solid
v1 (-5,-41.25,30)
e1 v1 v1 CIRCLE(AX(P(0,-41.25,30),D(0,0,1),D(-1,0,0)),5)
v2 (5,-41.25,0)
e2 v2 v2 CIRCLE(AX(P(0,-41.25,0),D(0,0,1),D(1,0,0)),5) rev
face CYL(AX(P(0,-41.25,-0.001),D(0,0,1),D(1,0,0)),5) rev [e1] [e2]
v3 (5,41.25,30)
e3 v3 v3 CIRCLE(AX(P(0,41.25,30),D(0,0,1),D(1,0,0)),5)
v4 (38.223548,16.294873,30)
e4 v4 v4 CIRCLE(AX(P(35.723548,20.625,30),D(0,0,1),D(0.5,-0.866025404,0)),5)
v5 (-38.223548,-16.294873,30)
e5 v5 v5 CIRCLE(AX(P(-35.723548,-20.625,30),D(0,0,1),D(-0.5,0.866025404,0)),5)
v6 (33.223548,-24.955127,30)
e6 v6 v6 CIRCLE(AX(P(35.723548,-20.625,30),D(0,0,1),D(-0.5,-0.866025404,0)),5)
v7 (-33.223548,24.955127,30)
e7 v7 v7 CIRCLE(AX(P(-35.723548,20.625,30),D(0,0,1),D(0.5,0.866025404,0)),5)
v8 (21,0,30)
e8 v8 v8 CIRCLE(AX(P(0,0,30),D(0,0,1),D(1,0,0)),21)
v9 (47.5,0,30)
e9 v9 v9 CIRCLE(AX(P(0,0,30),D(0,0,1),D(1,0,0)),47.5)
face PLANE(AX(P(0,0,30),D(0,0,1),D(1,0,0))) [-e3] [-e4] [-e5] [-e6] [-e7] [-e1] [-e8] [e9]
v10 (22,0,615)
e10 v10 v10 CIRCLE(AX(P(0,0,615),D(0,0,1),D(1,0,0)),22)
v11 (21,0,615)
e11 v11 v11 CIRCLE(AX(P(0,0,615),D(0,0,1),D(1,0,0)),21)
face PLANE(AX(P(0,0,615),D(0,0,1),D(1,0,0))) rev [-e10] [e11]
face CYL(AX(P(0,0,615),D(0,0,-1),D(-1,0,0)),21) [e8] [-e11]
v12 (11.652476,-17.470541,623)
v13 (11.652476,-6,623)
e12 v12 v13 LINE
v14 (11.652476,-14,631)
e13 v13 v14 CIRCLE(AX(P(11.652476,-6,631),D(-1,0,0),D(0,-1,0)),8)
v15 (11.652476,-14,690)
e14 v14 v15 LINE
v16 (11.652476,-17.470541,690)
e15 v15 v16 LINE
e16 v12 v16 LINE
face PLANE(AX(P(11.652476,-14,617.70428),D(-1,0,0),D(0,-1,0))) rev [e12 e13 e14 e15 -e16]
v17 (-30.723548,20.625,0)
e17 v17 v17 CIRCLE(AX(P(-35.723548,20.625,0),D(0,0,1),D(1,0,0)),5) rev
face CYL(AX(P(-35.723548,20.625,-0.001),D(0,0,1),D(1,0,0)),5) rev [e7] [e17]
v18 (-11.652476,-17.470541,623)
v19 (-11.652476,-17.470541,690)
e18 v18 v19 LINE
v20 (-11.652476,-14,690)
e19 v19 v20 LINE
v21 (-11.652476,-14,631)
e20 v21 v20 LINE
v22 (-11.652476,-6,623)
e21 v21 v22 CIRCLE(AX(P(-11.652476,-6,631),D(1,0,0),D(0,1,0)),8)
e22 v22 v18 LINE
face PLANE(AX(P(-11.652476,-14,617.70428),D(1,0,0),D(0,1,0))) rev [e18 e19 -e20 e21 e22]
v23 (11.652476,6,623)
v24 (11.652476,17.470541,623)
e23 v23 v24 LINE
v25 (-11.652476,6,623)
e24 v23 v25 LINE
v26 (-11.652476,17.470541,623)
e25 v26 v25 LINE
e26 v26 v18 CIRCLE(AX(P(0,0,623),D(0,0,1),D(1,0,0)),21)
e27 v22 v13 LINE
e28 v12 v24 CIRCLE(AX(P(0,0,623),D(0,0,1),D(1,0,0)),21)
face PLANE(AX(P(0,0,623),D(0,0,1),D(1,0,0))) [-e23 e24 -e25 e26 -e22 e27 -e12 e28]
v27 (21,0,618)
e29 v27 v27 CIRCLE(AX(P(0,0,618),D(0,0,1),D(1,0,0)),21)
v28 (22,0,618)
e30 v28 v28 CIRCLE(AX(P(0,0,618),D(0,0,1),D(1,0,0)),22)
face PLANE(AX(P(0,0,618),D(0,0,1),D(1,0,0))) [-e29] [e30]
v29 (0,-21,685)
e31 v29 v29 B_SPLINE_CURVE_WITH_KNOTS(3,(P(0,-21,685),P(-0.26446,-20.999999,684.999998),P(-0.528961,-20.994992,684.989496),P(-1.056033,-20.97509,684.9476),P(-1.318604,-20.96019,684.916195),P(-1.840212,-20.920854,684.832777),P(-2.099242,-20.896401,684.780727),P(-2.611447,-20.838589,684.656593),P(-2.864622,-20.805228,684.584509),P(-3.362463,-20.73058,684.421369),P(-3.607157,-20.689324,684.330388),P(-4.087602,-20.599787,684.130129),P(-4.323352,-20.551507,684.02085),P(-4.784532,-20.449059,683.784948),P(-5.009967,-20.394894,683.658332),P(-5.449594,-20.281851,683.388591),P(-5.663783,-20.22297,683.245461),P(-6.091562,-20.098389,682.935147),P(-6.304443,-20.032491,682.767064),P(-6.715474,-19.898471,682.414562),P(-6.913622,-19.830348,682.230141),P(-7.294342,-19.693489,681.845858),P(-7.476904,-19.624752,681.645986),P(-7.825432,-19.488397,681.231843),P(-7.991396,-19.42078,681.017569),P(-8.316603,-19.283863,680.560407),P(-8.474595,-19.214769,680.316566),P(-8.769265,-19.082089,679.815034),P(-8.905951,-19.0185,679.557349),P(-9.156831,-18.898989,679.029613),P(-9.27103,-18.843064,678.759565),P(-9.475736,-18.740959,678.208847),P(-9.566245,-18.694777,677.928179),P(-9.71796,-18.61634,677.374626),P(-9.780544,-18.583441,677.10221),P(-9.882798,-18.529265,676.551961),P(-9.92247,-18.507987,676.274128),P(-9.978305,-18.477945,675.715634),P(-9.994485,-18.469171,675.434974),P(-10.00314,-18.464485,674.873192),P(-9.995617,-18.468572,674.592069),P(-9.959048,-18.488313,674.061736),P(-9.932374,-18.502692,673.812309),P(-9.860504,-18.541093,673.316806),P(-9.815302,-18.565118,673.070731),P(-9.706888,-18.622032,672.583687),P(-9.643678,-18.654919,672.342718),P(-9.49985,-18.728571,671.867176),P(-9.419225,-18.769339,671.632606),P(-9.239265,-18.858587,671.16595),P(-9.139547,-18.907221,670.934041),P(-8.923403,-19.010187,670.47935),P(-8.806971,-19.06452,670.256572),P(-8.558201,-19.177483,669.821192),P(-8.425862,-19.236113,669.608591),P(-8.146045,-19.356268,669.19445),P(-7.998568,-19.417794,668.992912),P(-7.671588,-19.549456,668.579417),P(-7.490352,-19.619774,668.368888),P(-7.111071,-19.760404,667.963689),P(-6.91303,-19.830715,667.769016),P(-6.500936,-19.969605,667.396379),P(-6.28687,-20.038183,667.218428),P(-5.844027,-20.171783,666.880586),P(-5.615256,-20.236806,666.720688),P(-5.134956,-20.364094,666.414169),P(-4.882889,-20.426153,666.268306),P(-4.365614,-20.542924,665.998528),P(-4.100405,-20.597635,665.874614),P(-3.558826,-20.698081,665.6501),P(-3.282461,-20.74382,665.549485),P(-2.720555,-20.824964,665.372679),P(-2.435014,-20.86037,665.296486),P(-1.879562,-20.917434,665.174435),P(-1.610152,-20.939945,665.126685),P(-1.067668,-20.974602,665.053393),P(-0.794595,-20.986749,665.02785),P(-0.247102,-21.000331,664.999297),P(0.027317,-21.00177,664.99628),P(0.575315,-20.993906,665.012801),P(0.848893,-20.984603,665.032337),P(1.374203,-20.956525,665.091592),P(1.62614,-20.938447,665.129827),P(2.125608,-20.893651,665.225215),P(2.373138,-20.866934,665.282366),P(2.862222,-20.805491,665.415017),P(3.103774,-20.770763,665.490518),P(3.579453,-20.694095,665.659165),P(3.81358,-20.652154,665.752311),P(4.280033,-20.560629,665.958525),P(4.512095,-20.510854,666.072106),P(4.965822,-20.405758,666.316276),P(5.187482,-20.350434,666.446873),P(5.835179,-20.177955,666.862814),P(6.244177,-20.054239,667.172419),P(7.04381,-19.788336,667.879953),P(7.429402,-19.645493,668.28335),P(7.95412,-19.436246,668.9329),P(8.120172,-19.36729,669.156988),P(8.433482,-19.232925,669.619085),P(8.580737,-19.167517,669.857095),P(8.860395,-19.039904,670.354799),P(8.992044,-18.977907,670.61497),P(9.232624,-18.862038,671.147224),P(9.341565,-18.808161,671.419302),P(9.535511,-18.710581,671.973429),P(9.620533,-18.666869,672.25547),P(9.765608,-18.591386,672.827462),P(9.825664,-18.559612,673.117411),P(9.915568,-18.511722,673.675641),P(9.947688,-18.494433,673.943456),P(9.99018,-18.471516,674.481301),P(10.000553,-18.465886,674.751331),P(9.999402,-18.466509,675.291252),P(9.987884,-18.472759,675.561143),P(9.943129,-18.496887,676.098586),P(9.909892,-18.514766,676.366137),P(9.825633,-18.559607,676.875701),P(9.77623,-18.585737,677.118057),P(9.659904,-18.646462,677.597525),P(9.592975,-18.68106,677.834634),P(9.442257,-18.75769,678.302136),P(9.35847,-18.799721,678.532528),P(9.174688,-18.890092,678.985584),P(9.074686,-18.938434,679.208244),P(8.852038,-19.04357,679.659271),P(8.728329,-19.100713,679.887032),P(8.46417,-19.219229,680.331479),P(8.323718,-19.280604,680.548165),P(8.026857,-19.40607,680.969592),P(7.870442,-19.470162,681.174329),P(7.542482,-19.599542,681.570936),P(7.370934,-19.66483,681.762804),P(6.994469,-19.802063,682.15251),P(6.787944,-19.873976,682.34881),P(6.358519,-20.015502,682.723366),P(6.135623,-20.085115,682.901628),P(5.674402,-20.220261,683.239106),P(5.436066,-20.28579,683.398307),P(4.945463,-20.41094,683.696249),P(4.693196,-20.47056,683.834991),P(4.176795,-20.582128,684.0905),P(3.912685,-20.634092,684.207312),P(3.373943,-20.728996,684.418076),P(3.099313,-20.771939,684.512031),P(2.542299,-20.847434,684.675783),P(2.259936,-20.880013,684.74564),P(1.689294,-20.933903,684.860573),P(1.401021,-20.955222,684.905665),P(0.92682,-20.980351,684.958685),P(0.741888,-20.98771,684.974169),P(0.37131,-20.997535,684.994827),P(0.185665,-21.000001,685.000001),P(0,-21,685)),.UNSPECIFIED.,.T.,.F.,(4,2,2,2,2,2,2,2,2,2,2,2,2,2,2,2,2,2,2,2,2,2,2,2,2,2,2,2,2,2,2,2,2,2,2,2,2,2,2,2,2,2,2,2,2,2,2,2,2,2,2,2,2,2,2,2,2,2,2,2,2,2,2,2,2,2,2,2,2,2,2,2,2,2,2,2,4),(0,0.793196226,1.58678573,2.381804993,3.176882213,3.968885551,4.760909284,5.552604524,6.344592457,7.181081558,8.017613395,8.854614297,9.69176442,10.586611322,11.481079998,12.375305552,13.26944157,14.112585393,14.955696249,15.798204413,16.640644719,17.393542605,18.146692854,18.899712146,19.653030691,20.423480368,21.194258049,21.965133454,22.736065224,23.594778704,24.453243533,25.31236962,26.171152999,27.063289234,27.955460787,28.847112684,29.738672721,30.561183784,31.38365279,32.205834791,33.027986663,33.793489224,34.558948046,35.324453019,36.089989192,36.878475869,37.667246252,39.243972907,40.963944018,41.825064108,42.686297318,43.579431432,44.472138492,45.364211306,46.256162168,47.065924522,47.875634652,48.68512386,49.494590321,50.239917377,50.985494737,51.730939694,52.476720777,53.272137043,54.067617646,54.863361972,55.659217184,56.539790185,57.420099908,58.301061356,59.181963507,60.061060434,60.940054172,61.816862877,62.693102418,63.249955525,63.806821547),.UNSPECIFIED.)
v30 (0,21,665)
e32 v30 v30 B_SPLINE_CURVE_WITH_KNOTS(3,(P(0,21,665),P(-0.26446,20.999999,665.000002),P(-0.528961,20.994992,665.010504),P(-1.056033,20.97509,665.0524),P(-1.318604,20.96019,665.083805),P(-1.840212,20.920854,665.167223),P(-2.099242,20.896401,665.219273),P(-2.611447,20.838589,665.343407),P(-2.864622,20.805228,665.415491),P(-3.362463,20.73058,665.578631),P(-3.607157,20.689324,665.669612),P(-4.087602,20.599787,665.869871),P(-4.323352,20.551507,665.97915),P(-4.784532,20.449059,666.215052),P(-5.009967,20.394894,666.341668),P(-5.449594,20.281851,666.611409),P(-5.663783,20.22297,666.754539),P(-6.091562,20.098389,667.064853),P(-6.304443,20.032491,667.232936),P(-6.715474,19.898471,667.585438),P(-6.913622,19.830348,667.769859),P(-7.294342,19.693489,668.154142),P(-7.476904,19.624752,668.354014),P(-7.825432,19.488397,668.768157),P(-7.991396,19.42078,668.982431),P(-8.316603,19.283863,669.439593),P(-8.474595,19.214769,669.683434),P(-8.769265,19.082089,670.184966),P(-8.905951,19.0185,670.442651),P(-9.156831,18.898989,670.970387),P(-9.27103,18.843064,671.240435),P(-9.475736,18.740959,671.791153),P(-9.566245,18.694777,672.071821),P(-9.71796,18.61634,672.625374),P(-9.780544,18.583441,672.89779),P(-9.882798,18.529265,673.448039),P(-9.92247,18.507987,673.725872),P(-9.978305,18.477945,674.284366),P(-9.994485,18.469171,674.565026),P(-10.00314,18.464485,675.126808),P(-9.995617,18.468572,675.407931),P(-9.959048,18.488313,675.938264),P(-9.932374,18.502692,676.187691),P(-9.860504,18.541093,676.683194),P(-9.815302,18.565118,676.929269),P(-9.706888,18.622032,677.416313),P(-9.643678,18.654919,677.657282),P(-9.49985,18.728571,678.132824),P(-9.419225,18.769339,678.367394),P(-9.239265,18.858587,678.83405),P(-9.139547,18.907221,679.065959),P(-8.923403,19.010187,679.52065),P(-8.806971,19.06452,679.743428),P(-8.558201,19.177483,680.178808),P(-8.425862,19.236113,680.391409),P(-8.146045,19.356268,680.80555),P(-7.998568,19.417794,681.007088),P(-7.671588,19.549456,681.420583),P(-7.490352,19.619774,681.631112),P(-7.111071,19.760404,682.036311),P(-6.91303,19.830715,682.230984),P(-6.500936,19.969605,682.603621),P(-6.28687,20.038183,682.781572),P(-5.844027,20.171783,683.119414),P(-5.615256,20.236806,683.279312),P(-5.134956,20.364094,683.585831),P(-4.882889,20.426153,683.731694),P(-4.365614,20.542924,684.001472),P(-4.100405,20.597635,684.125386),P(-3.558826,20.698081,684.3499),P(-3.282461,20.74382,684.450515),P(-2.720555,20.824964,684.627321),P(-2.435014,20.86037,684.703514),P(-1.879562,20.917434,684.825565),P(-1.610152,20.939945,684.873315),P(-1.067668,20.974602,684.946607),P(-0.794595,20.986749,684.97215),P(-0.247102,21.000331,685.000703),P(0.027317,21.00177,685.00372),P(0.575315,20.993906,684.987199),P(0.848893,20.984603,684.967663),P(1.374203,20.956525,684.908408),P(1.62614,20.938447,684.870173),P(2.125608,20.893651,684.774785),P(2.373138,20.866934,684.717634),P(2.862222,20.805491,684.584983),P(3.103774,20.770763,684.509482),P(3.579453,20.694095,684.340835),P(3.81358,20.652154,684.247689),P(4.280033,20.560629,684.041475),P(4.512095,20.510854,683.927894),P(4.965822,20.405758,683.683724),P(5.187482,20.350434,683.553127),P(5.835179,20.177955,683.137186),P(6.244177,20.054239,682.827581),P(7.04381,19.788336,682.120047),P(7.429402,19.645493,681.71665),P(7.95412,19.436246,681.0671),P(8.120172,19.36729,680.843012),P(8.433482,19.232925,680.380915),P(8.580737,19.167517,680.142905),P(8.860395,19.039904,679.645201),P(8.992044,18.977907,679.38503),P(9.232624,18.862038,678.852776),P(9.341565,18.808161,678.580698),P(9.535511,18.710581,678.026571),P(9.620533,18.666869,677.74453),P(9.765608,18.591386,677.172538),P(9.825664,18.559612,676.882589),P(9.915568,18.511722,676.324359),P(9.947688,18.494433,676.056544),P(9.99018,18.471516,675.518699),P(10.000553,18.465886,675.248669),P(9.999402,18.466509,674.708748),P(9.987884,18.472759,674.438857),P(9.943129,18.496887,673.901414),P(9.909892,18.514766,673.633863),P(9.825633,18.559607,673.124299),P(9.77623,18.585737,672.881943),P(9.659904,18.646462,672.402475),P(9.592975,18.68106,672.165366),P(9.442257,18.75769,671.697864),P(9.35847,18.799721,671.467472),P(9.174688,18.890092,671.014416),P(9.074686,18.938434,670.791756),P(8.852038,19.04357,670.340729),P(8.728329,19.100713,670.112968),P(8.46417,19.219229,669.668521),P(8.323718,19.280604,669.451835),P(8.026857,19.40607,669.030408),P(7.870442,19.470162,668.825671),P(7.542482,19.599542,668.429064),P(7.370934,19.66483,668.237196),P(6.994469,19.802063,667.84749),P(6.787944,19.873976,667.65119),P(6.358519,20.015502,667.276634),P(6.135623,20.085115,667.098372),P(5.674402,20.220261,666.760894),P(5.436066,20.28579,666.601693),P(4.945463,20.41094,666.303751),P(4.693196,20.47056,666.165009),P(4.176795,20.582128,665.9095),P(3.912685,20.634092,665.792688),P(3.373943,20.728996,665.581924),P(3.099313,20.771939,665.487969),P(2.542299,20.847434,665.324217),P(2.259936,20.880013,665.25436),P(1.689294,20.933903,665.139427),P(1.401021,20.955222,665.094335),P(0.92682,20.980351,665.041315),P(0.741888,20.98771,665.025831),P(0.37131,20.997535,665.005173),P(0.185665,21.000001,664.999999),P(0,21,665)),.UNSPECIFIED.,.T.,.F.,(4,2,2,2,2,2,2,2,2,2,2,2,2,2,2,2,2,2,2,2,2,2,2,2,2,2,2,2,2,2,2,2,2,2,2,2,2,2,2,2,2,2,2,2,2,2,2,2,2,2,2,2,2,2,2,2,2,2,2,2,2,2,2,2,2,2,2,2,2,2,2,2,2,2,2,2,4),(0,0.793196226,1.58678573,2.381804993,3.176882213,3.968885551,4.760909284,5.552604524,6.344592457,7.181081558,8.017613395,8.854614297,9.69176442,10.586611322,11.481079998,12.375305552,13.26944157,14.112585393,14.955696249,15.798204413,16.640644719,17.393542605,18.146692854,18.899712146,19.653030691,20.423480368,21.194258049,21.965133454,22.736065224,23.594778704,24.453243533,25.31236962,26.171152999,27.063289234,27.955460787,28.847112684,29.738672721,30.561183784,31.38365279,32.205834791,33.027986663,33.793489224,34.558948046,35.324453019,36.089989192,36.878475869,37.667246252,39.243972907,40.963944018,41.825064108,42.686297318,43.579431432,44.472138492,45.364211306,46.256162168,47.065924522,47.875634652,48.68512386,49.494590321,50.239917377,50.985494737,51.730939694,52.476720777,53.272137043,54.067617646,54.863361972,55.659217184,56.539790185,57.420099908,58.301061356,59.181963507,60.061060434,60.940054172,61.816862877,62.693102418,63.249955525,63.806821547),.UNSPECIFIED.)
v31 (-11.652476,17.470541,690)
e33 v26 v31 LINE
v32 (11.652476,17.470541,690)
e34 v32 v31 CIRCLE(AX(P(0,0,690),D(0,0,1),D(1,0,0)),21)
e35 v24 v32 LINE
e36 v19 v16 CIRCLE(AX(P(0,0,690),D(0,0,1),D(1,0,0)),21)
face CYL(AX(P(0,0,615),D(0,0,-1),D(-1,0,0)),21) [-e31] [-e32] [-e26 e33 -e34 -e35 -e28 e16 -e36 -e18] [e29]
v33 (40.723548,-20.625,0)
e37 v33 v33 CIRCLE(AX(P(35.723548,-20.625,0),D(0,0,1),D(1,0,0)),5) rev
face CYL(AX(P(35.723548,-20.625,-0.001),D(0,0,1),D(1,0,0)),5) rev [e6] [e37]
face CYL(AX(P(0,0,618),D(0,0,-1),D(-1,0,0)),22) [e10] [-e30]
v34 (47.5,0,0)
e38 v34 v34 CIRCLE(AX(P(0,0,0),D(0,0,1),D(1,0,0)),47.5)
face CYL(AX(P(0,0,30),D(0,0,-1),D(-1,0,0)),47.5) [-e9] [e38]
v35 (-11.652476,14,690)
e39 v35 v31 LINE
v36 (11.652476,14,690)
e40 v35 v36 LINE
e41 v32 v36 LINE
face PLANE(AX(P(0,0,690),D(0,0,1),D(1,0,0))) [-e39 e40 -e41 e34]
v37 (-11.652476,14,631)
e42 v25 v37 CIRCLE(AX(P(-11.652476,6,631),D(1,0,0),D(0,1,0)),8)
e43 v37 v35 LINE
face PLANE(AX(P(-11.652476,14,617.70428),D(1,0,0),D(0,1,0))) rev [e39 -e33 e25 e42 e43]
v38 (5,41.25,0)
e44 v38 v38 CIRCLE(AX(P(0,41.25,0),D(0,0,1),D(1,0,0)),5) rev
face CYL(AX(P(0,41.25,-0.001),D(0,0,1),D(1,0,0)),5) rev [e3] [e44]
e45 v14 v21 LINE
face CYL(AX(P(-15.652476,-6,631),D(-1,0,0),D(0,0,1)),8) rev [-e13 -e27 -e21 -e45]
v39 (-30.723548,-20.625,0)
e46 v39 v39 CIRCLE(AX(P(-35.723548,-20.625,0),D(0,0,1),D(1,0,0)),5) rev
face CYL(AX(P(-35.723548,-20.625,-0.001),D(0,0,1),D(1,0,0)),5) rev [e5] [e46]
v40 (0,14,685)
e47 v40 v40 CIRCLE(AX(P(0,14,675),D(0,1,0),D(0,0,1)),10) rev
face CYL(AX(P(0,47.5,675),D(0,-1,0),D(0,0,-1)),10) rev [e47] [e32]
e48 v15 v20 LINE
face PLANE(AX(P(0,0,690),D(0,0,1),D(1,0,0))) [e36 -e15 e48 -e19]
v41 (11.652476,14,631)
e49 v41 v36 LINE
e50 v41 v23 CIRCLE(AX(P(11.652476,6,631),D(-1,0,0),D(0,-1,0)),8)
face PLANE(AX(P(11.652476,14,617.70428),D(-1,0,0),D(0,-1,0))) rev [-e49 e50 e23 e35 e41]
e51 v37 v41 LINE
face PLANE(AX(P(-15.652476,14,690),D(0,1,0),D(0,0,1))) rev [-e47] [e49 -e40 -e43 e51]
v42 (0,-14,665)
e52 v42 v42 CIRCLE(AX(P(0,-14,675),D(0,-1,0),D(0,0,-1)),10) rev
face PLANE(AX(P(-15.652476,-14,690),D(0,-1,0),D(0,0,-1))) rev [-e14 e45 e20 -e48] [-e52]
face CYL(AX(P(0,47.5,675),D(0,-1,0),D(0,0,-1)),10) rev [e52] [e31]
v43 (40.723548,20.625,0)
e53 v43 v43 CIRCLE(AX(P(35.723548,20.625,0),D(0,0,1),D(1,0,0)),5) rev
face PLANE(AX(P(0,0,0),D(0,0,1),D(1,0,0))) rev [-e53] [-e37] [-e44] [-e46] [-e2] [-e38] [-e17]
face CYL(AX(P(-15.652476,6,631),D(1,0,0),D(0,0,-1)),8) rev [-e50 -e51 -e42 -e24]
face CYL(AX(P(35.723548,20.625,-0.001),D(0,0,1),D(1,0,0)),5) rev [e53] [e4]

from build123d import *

# Parameters (mm, degrees)
SZKIC1_R                               = 47.5
DODANIE_WYCI_GNI_CIE1_DEPTH            = 30
WYTNIJ_WYCI_GNI_CIE1_REACH             = 75.57
SZKIC2_R                               = 5
SZYK_KO_OWY1_COUNT                     = 6
SZKIC3_R                               = 21
DODANIE_WYCI_GNI_CIE2_DEPTH            = 585
DODANIE_WYCI_GNI_CIE3_DEPTH            = 75
SZKIC5_R                               = 22
DODANIE_WYCI_GNI_CIE4_DEPTH            = 3
SZKIC7_R                               = 21
DODANIE_WYCI_GNI_CIE5_DEPTH            = 5
WYTNIJ_WYCI_GNI_CIE2_REACH             = 696.362
SZKIC8_R                               = 10
WYTNIJ_WYCI_GNI_CIE2_DIRECTION_2_DEPTH = 695.361937321
WYTNIJ_WYCI_GNI_CIE3_START             = -67
WYTNIJ_WYCI_GNI_CIE3_DEPTH             = 67
ZAOKR_GLENIE1_R                        = 8


with BuildPart() as part:
    # Szkic1 → Dodanie-wyciągnięcie1 (new body)
    with BuildSketch(Plane.XY):
        Circle(SZKIC1_R)
    extrude(amount=DODANIE_WYCI_GNI_CIE1_DEPTH)

    # Szkic2 → Wytnij-wyciągnięcie1 (cut, up to next)
    with BuildSketch(Plane.XY.offset(30), mode=Mode.PRIVATE) as wytnij_wyci_gni_cie1_sk1:
        with Locations((0, 41.25)):
            Circle(SZKIC2_R)
    wytnij_wyci_gni_cie1_tool1 = extrude(wytnij_wyci_gni_cie1_sk1.sketch, amount=-WYTNIJ_WYCI_GNI_CIE1_REACH, mode=Mode.PRIVATE) & part.part
    wytnij_wyci_gni_cie1 = wytnij_wyci_gni_cie1_tool1.solids().sort_by_distance((0, 41.25, 30))[0]
    add(wytnij_wyci_gni_cie1, mode=Mode.SUBTRACT)

    # Szyk kołowy1: Wytnij-wyciągnięcie1 ×6 about axis
    szyk_ko_owy1_axis = Axis((0, 0, 0), (0, 0, 1))
    for i in range(1, SZYK_KO_OWY1_COUNT):
        add(wytnij_wyci_gni_cie1.rotate(szyk_ko_owy1_axis, i * 360 / SZYK_KO_OWY1_COUNT), mode=Mode.SUBTRACT)

    # Szkic3 → Dodanie-wyciągnięcie2 (add)
    with BuildSketch(Plane.XY.offset(30)):
        Circle(SZKIC3_R)
    extrude(amount=DODANIE_WYCI_GNI_CIE2_DEPTH)

    # Szkic4 → Dodanie-wyciągnięcie3 (add)
    with BuildSketch(Plane.XY.offset(615)):
        with BuildLine():
            Line((-15.652475842, 14), (15.652475842, 14))
            ThreePointArc((15.652475842, 14), (0, 21), (-15.652475842, 14))
        make_face()
        with BuildLine():
            Line((-15.652475842, -14), (15.652475842, -14))
            ThreePointArc((15.652475842, -14), (0, -21), (-15.652475842, -14))
        make_face()
    extrude(amount=DODANIE_WYCI_GNI_CIE3_DEPTH)

    # Szkic5 → Dodanie-wyciągnięcie4 (add)
    with BuildSketch(Plane.XY.offset(615)):
        Circle(SZKIC5_R)
    extrude(amount=DODANIE_WYCI_GNI_CIE4_DEPTH)

    # Szkic7 → Dodanie-wyciągnięcie5 (add)
    with BuildSketch(Plane.XY.offset(618)):
        Circle(SZKIC7_R)
    extrude(amount=DODANIE_WYCI_GNI_CIE5_DEPTH)

    # Szkic8 → Wytnij-wyciągnięcie2 (cut, up to next)
    with BuildSketch(Plane(origin=(0, -14, 0), x_dir=(1, 0, 0), z_dir=(0, 1, 0)), mode=Mode.PRIVATE) as wytnij_wyci_gni_cie2_sk1:
        with Locations(Location((0, -675, 0), (0, 0, 90))):
            Circle(SZKIC8_R)
    wytnij_wyci_gni_cie2_tool1 = extrude(wytnij_wyci_gni_cie2_sk1.sketch, amount=-WYTNIJ_WYCI_GNI_CIE2_REACH, mode=Mode.PRIVATE) & part.part
    add(wytnij_wyci_gni_cie2_tool1.solids().sort_by_distance((0, -14, 675))[0], mode=Mode.SUBTRACT)

    # Szkic8 → Wytnij-wyciągnięcie2 direction 2 (cut)
    with BuildSketch(Plane(origin=(0, -14, 0), x_dir=(1, 0, 0), z_dir=(0, 1, 0))):
        with Locations(Location((0, -675, 0), (0, 0, 90))):
            Circle(SZKIC8_R)
    extrude(amount=WYTNIJ_WYCI_GNI_CIE2_DIRECTION_2_DEPTH, mode=Mode.SUBTRACT)

    # Szkic9 → Wytnij-wyciągnięcie3 (cut)
    with BuildSketch(Plane.XY.offset(690).offset(WYTNIJ_WYCI_GNI_CIE3_START)):
        with BuildLine():
            Line((-11.652475842, 14), (-11.652475842, 17.470541112))
            ThreePointArc((-11.652475842, 17.470541112), (-13.762313052, 15.861864312), (-15.652475842, 14))
            Line((-15.652475842, 14), (-11.652475842, 14))
        make_face()
        with BuildLine():
            Line((15.652475842, 14), (11.652475842, 14))
            Line((11.652475842, 14), (11.652475842, 17.470541112))
            ThreePointArc((11.652475842, 17.470541112), (13.762313052, 15.861864312), (15.652475842, 14))
        make_face()
        with BuildLine():
            Line((11.652475842, -14), (11.652475842, -17.470541112))
            ThreePointArc((11.652475842, -17.470541112), (13.762313052, -15.861864312), (15.652475842, -14))
            Line((15.652475842, -14), (11.652475842, -14))
        make_face()
        with BuildLine():
            Line((-15.652475842, -14), (-11.652475842, -14))
            Line((-11.652475842, -14), (-11.652475842, -17.470541112))
            ThreePointArc((-11.652475842, -17.470541112), (-13.762313052, -15.861864312), (-15.652475842, -14))
        make_face()
    extrude(amount=WYTNIJ_WYCI_GNI_CIE3_DEPTH, mode=Mode.SUBTRACT)

    # Zaokrąglenie1
    # the kernel refuses this fillet: 8 mm, written as the material it adds along each edge
    with BuildSketch(Plane(origin=(-11.652475842, -14, 623), x_dir=(0, 1, 0), z_dir=(1, 0, 0))) as zaokr_glenie1_piece_1:
        with BuildLine():
            CenterArc((ZAOKR_GLENIE1_R, ZAOKR_GLENIE1_R), ZAOKR_GLENIE1_R, 180, 90)
            Line((0, ZAOKR_GLENIE1_R), (0, 0))
            Line((0, 0), (ZAOKR_GLENIE1_R, 0))
        make_face()
    extrude(amount=23.304951685)
    with BuildSketch(Plane(origin=(-11.652475842, 14, 623), x_dir=(0, -1, 0), z_dir=(1, 0, 0))) as zaokr_glenie1_piece_2:
        with BuildLine():
            CenterArc((ZAOKR_GLENIE1_R, -ZAOKR_GLENIE1_R), ZAOKR_GLENIE1_R, 90, 90)
            Line((0, -ZAOKR_GLENIE1_R), (0, 0))
            Line((0, 0), (ZAOKR_GLENIE1_R, 0))
        make_face()
    extrude(amount=23.304951685)


solid = part.part
